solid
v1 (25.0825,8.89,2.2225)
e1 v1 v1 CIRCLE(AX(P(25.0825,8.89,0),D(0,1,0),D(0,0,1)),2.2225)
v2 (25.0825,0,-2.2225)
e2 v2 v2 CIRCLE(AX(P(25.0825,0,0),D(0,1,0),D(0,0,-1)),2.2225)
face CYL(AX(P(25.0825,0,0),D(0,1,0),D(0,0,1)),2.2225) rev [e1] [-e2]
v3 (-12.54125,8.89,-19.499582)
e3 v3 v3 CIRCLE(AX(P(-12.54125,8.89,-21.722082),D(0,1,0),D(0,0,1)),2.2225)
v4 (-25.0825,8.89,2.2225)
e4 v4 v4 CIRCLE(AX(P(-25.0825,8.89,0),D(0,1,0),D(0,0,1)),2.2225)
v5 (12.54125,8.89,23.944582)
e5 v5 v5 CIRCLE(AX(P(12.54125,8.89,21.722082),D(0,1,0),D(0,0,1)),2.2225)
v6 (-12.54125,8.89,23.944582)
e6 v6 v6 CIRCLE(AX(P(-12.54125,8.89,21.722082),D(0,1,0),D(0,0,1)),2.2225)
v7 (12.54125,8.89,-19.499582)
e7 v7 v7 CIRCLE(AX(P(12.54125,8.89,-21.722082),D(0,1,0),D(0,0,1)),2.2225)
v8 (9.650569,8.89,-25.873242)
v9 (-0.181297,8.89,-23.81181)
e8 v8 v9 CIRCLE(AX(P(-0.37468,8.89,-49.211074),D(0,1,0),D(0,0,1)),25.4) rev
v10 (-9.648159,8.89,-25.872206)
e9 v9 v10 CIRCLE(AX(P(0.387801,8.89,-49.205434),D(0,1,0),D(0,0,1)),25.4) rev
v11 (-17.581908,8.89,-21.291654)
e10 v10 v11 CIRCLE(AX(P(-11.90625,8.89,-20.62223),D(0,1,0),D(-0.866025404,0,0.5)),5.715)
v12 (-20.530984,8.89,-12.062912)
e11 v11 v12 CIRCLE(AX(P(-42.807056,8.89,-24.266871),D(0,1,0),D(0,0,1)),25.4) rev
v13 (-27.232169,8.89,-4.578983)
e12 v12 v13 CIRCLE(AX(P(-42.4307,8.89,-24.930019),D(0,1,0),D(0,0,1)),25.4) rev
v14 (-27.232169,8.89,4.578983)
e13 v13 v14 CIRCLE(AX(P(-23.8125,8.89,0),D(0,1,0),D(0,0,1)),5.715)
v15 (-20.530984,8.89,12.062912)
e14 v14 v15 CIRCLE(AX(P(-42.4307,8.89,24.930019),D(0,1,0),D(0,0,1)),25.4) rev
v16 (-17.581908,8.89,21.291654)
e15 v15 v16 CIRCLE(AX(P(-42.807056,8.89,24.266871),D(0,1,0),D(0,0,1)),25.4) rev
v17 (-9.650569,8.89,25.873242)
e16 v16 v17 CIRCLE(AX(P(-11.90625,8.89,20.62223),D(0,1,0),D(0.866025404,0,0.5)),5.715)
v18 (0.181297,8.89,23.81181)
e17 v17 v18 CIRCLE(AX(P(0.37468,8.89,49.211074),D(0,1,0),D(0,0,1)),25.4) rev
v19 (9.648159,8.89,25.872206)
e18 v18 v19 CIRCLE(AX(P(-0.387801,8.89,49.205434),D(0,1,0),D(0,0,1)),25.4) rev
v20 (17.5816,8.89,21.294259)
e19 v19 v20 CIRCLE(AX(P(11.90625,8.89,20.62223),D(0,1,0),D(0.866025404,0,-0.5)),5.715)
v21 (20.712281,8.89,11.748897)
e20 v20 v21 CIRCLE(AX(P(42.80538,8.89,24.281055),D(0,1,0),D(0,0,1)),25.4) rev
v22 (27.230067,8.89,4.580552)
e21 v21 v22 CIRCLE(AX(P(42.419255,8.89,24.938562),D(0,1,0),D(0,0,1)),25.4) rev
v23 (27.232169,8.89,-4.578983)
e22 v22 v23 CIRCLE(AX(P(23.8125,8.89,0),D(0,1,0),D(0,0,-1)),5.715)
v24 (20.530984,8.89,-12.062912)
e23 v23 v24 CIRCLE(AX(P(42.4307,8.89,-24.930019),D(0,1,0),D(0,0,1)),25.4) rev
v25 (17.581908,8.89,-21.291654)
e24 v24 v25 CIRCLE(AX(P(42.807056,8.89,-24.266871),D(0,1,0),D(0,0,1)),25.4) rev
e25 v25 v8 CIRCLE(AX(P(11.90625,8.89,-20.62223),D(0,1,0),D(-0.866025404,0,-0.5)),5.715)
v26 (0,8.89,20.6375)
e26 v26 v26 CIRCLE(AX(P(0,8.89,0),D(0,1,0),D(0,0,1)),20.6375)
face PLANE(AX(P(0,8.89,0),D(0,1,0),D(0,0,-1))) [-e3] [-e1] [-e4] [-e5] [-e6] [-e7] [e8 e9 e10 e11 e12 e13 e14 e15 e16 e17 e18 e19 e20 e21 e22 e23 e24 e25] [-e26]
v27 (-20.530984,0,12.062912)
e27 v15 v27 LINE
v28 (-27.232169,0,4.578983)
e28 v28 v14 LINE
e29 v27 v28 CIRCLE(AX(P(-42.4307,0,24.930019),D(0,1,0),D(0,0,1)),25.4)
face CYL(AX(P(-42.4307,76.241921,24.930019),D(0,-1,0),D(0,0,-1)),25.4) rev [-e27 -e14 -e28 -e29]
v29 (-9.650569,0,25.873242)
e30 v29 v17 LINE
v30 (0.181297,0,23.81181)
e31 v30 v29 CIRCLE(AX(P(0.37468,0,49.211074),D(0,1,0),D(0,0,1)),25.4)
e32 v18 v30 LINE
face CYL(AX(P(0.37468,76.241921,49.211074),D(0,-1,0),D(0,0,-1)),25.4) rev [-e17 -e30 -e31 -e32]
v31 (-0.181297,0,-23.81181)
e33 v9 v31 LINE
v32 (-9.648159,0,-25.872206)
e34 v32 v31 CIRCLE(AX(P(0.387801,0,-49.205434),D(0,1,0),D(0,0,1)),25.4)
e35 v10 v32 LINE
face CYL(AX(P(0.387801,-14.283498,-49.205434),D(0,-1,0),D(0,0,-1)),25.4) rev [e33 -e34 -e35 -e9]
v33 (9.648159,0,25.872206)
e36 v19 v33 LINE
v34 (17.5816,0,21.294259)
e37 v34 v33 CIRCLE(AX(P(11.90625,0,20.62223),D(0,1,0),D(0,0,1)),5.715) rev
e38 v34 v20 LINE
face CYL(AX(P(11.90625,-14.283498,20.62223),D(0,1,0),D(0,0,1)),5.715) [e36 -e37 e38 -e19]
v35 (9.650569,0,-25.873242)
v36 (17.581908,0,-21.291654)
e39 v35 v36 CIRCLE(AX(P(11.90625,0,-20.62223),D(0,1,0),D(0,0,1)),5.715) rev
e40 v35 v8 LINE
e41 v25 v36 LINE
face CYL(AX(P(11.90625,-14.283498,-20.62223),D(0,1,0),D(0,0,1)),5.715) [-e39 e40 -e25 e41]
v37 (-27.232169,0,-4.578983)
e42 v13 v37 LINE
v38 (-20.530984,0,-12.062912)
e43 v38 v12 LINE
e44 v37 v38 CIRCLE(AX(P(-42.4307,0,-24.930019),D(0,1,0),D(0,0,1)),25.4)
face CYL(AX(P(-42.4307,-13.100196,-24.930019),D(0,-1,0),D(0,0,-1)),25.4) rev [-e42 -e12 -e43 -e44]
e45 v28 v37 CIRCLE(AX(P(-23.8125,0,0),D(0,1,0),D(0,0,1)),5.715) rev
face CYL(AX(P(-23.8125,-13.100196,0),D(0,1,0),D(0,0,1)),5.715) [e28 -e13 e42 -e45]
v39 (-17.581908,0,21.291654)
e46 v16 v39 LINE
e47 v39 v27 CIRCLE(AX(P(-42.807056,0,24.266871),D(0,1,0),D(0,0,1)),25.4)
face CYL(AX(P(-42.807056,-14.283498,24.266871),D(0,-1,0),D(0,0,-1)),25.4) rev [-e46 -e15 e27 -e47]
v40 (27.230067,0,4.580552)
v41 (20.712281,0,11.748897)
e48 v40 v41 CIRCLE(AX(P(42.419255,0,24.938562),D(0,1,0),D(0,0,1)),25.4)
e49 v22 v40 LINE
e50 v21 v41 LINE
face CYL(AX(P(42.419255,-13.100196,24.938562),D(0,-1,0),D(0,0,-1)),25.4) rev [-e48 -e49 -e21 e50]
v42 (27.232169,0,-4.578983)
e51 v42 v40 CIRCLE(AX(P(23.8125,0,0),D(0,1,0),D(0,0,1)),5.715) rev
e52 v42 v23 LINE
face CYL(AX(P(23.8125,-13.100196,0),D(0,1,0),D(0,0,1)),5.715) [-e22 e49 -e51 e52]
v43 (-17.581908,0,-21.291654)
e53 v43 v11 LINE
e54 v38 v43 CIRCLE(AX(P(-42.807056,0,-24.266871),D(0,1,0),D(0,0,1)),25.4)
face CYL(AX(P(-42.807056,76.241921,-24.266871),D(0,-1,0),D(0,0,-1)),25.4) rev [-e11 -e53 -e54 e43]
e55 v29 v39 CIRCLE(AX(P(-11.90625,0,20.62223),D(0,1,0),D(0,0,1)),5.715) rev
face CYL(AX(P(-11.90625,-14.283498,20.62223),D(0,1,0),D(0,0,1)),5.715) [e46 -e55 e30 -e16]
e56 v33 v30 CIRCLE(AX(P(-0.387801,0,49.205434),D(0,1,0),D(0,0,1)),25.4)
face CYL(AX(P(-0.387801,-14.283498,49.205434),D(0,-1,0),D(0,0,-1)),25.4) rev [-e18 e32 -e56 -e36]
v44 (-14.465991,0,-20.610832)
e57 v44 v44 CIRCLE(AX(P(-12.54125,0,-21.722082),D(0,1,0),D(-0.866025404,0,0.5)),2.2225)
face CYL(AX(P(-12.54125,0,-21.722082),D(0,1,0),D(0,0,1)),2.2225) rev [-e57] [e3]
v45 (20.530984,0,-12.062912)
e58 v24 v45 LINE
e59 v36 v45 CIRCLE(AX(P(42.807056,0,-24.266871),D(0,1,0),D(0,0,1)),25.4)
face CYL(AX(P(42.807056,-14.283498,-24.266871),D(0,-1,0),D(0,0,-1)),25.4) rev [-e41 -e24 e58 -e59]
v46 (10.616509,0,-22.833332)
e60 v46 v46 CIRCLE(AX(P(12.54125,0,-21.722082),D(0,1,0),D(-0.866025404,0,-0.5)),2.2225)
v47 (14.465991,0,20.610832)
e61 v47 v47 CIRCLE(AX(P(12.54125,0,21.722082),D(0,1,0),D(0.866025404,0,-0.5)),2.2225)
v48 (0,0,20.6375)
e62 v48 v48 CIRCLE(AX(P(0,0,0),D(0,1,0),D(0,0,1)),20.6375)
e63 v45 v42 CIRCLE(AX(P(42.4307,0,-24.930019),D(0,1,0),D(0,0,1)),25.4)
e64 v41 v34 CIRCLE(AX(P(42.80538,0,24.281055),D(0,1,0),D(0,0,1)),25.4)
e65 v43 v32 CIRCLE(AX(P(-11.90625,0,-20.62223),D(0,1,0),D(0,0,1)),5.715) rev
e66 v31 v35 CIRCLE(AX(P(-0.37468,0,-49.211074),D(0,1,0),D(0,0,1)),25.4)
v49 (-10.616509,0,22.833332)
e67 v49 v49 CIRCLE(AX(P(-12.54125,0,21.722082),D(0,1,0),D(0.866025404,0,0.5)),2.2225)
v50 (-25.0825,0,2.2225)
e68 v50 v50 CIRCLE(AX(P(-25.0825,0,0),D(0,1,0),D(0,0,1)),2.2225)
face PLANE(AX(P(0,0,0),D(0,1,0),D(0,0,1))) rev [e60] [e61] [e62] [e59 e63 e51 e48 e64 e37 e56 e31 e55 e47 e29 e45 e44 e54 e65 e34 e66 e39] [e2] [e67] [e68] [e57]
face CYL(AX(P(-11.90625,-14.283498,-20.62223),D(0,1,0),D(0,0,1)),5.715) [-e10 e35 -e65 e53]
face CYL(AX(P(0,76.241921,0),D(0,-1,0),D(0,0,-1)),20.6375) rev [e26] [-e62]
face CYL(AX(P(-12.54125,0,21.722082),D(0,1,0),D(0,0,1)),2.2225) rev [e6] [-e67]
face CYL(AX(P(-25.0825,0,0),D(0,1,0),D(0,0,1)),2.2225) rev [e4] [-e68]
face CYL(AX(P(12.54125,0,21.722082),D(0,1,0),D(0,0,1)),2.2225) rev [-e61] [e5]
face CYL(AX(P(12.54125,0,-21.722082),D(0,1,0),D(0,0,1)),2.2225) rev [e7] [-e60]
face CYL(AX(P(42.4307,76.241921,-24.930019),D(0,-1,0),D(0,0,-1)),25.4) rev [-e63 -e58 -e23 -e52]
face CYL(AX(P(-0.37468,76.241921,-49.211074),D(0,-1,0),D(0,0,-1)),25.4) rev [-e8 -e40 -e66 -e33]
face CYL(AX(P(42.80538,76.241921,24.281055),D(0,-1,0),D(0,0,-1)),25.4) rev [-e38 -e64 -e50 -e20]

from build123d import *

# Parameters (mm, degrees)
SKETCH1_R           = 23.8125
SKETCH1_R_2         = 20.6375
BOSS_EXTRUDE1_DEPTH = 8.89
BOSS_EXTRUDE2_START = -8.89
BOSS_EXTRUDE2_DEPTH = 8.89
FILLET1_R           = 25.4
CIRPATTERN1_DEPTH   = 8.89
SKETCH3_R           = 2.2225
CUT_EXTRUDE1_DEPTH  = 41.553113931
CIRPATTERN2_COUNT   = 6


# Read off the part's stored shape, not the designer's step: CirPattern1
with BuildPart() as part:
    # Sketch1 → Boss-Extrude1 (new body)
    with BuildSketch(Plane(origin=(0, 0, 0), x_dir=(1, 0, 0), z_dir=(0, 1, 0))):
        with Locations(Location((0, 0, 0), (0, 0, 270))):
            Circle(SKETCH1_R)
        with Locations(Location((0, 0, 0), (0, 0, 270))):
            Circle(SKETCH1_R_2, mode=Mode.SUBTRACT)
    extrude(amount=BOSS_EXTRUDE1_DEPTH)

    # Sketch2 → Boss-Extrude2 (add)
    with BuildSketch(Plane(origin=(0, 8.89, 0), x_dir=(1, 0, 0), z_dir=(0, 1, 0)).offset(BOSS_EXTRUDE2_START)):
        with BuildLine():
            ThreePointArc((-23.1267, 5.673702791), (-29.5275, 0), (-23.1267, -5.673702791))
            ThreePointArc((-23.1267, -5.673702791), (-23.8125, 0), (-23.1267, 5.673702791))
        make_face()
    extrude(amount=BOSS_EXTRUDE2_DEPTH)

    # Fillet1
    fillet1_edges = [part.edges().sort_by_distance(p)[0] for p in [
        (-23.1267, 4.445, -5.673702791),
        (-23.1267, 4.445, 5.673702791),
    ]]
    fillet(fillet1_edges, radius=FILLET1_R)

    # CirPattern1 outline → CirPattern1 (add)
    with BuildSketch(Plane(origin=(0, 0, 0), x_dir=(1, 0, 0), z_dir=(0, 1, 0))):
        with BuildLine():
            ThreePointArc((-20.530983871, -12.062912482), (-18.612348128, -16.535370154), (-17.581908256, -21.29165383))
            ThreePointArc((-17.581908256, -21.29165383), (-14.764885819, -25.570909171), (-9.650569001, -25.873242043))
            ThreePointArc((-9.650569001, -25.873242043), (-4.837563965, -24.35161844), (0.181296717, -23.811809838))
            ThreePointArc((0.181296717, -23.811809838), (-11.748897356, -20.712280588), (-20.530983871, -12.062912482))
        make_face()
        with BuildLine():
            ThreePointArc((-20.530983871, 12.062912482), (-11.90625, 20.622229928), (-0.181296717, 23.811809838))
            ThreePointArc((-0.181296717, 23.811809838), (-5.01387655, 24.38645138), (-9.648158978, 25.872206112))
            ThreePointArc((-9.648158978, 25.872206112), (-14.76375, 25.57156511), (-17.581908256, 21.29165383))
            ThreePointArc((-17.581908256, 21.29165383), (-18.612348128, 16.535370154), (-20.530983871, 12.062912482))
        make_face()
        with BuildLine():
            ThreePointArc((-0.181296717, 23.811809838), (11.748897356, 20.712280588), (20.530983871, 12.062912482))
            ThreePointArc((20.530983871, 12.062912482), (18.612348128, 16.535370154), (17.581908256, 21.29165383))
            ThreePointArc((17.581908256, 21.29165383), (14.764885819, 25.570909171), (9.650569001, 25.873242043))
            ThreePointArc((9.650569001, 25.873242043), (4.837563965, 24.35161844), (-0.181296717, 23.811809838))
        make_face()
        with BuildLine():
            ThreePointArc((20.530983871, 12.062912482), (23.811809838, 0.181296717), (20.712280588, -11.748897356))
            ThreePointArc((20.712280588, -11.748897356), (23.626224678, -7.851081226), (27.230067234, -4.580552281))
            ThreePointArc((27.230067234, -4.580552281), (29.527499849, -0.001311618), (27.232169388, 4.578983105))
            ThreePointArc((27.232169388, 4.578983105), (23.507902174, 7.986355934), (20.530983871, 12.062912482))
        make_face()
        with BuildLine():
            ThreePointArc((20.712280588, -11.748897356), (12.062912482, -20.530983871), (0.181296717, -23.811809838))
            ThreePointArc((0.181296717, -23.811809838), (5.01387655, -24.38645138), (9.648158978, -25.872206112))
            ThreePointArc((9.648158978, -25.872206112), (14.762614031, -25.572220789), (17.581600387, -21.294258937))
            ThreePointArc((17.581600387, -21.294258937), (18.67033821, -16.365262506), (20.712280588, -11.748897356))
        make_face()
    extrude(amount=CIRPATTERN1_DEPTH)

    # Sketch3 → Cut-Extrude1 (cut, symmetric)
    with BuildSketch(Plane(origin=(0, 8.89, 0), x_dir=(1, 0, 0), z_dir=(0, 1, 0))):
        with Locations(Location((-25.0825, 0, 0), (0, 0, 270))):
            Circle(SKETCH3_R)
    cut_extrude1 = extrude(amount=CUT_EXTRUDE1_DEPTH, both=True, mode=Mode.SUBTRACT)

    # CirPattern2: Cut-Extrude1 ×6 about axis
    cirpattern2_axis = Axis((0, 0, 0), (0, 1, 0))
    for i in range(1, CIRPATTERN2_COUNT):
        add(cut_extrude1.rotate(cirpattern2_axis, i * 360 / CIRPATTERN2_COUNT), mode=Mode.SUBTRACT)


solid = part.part
